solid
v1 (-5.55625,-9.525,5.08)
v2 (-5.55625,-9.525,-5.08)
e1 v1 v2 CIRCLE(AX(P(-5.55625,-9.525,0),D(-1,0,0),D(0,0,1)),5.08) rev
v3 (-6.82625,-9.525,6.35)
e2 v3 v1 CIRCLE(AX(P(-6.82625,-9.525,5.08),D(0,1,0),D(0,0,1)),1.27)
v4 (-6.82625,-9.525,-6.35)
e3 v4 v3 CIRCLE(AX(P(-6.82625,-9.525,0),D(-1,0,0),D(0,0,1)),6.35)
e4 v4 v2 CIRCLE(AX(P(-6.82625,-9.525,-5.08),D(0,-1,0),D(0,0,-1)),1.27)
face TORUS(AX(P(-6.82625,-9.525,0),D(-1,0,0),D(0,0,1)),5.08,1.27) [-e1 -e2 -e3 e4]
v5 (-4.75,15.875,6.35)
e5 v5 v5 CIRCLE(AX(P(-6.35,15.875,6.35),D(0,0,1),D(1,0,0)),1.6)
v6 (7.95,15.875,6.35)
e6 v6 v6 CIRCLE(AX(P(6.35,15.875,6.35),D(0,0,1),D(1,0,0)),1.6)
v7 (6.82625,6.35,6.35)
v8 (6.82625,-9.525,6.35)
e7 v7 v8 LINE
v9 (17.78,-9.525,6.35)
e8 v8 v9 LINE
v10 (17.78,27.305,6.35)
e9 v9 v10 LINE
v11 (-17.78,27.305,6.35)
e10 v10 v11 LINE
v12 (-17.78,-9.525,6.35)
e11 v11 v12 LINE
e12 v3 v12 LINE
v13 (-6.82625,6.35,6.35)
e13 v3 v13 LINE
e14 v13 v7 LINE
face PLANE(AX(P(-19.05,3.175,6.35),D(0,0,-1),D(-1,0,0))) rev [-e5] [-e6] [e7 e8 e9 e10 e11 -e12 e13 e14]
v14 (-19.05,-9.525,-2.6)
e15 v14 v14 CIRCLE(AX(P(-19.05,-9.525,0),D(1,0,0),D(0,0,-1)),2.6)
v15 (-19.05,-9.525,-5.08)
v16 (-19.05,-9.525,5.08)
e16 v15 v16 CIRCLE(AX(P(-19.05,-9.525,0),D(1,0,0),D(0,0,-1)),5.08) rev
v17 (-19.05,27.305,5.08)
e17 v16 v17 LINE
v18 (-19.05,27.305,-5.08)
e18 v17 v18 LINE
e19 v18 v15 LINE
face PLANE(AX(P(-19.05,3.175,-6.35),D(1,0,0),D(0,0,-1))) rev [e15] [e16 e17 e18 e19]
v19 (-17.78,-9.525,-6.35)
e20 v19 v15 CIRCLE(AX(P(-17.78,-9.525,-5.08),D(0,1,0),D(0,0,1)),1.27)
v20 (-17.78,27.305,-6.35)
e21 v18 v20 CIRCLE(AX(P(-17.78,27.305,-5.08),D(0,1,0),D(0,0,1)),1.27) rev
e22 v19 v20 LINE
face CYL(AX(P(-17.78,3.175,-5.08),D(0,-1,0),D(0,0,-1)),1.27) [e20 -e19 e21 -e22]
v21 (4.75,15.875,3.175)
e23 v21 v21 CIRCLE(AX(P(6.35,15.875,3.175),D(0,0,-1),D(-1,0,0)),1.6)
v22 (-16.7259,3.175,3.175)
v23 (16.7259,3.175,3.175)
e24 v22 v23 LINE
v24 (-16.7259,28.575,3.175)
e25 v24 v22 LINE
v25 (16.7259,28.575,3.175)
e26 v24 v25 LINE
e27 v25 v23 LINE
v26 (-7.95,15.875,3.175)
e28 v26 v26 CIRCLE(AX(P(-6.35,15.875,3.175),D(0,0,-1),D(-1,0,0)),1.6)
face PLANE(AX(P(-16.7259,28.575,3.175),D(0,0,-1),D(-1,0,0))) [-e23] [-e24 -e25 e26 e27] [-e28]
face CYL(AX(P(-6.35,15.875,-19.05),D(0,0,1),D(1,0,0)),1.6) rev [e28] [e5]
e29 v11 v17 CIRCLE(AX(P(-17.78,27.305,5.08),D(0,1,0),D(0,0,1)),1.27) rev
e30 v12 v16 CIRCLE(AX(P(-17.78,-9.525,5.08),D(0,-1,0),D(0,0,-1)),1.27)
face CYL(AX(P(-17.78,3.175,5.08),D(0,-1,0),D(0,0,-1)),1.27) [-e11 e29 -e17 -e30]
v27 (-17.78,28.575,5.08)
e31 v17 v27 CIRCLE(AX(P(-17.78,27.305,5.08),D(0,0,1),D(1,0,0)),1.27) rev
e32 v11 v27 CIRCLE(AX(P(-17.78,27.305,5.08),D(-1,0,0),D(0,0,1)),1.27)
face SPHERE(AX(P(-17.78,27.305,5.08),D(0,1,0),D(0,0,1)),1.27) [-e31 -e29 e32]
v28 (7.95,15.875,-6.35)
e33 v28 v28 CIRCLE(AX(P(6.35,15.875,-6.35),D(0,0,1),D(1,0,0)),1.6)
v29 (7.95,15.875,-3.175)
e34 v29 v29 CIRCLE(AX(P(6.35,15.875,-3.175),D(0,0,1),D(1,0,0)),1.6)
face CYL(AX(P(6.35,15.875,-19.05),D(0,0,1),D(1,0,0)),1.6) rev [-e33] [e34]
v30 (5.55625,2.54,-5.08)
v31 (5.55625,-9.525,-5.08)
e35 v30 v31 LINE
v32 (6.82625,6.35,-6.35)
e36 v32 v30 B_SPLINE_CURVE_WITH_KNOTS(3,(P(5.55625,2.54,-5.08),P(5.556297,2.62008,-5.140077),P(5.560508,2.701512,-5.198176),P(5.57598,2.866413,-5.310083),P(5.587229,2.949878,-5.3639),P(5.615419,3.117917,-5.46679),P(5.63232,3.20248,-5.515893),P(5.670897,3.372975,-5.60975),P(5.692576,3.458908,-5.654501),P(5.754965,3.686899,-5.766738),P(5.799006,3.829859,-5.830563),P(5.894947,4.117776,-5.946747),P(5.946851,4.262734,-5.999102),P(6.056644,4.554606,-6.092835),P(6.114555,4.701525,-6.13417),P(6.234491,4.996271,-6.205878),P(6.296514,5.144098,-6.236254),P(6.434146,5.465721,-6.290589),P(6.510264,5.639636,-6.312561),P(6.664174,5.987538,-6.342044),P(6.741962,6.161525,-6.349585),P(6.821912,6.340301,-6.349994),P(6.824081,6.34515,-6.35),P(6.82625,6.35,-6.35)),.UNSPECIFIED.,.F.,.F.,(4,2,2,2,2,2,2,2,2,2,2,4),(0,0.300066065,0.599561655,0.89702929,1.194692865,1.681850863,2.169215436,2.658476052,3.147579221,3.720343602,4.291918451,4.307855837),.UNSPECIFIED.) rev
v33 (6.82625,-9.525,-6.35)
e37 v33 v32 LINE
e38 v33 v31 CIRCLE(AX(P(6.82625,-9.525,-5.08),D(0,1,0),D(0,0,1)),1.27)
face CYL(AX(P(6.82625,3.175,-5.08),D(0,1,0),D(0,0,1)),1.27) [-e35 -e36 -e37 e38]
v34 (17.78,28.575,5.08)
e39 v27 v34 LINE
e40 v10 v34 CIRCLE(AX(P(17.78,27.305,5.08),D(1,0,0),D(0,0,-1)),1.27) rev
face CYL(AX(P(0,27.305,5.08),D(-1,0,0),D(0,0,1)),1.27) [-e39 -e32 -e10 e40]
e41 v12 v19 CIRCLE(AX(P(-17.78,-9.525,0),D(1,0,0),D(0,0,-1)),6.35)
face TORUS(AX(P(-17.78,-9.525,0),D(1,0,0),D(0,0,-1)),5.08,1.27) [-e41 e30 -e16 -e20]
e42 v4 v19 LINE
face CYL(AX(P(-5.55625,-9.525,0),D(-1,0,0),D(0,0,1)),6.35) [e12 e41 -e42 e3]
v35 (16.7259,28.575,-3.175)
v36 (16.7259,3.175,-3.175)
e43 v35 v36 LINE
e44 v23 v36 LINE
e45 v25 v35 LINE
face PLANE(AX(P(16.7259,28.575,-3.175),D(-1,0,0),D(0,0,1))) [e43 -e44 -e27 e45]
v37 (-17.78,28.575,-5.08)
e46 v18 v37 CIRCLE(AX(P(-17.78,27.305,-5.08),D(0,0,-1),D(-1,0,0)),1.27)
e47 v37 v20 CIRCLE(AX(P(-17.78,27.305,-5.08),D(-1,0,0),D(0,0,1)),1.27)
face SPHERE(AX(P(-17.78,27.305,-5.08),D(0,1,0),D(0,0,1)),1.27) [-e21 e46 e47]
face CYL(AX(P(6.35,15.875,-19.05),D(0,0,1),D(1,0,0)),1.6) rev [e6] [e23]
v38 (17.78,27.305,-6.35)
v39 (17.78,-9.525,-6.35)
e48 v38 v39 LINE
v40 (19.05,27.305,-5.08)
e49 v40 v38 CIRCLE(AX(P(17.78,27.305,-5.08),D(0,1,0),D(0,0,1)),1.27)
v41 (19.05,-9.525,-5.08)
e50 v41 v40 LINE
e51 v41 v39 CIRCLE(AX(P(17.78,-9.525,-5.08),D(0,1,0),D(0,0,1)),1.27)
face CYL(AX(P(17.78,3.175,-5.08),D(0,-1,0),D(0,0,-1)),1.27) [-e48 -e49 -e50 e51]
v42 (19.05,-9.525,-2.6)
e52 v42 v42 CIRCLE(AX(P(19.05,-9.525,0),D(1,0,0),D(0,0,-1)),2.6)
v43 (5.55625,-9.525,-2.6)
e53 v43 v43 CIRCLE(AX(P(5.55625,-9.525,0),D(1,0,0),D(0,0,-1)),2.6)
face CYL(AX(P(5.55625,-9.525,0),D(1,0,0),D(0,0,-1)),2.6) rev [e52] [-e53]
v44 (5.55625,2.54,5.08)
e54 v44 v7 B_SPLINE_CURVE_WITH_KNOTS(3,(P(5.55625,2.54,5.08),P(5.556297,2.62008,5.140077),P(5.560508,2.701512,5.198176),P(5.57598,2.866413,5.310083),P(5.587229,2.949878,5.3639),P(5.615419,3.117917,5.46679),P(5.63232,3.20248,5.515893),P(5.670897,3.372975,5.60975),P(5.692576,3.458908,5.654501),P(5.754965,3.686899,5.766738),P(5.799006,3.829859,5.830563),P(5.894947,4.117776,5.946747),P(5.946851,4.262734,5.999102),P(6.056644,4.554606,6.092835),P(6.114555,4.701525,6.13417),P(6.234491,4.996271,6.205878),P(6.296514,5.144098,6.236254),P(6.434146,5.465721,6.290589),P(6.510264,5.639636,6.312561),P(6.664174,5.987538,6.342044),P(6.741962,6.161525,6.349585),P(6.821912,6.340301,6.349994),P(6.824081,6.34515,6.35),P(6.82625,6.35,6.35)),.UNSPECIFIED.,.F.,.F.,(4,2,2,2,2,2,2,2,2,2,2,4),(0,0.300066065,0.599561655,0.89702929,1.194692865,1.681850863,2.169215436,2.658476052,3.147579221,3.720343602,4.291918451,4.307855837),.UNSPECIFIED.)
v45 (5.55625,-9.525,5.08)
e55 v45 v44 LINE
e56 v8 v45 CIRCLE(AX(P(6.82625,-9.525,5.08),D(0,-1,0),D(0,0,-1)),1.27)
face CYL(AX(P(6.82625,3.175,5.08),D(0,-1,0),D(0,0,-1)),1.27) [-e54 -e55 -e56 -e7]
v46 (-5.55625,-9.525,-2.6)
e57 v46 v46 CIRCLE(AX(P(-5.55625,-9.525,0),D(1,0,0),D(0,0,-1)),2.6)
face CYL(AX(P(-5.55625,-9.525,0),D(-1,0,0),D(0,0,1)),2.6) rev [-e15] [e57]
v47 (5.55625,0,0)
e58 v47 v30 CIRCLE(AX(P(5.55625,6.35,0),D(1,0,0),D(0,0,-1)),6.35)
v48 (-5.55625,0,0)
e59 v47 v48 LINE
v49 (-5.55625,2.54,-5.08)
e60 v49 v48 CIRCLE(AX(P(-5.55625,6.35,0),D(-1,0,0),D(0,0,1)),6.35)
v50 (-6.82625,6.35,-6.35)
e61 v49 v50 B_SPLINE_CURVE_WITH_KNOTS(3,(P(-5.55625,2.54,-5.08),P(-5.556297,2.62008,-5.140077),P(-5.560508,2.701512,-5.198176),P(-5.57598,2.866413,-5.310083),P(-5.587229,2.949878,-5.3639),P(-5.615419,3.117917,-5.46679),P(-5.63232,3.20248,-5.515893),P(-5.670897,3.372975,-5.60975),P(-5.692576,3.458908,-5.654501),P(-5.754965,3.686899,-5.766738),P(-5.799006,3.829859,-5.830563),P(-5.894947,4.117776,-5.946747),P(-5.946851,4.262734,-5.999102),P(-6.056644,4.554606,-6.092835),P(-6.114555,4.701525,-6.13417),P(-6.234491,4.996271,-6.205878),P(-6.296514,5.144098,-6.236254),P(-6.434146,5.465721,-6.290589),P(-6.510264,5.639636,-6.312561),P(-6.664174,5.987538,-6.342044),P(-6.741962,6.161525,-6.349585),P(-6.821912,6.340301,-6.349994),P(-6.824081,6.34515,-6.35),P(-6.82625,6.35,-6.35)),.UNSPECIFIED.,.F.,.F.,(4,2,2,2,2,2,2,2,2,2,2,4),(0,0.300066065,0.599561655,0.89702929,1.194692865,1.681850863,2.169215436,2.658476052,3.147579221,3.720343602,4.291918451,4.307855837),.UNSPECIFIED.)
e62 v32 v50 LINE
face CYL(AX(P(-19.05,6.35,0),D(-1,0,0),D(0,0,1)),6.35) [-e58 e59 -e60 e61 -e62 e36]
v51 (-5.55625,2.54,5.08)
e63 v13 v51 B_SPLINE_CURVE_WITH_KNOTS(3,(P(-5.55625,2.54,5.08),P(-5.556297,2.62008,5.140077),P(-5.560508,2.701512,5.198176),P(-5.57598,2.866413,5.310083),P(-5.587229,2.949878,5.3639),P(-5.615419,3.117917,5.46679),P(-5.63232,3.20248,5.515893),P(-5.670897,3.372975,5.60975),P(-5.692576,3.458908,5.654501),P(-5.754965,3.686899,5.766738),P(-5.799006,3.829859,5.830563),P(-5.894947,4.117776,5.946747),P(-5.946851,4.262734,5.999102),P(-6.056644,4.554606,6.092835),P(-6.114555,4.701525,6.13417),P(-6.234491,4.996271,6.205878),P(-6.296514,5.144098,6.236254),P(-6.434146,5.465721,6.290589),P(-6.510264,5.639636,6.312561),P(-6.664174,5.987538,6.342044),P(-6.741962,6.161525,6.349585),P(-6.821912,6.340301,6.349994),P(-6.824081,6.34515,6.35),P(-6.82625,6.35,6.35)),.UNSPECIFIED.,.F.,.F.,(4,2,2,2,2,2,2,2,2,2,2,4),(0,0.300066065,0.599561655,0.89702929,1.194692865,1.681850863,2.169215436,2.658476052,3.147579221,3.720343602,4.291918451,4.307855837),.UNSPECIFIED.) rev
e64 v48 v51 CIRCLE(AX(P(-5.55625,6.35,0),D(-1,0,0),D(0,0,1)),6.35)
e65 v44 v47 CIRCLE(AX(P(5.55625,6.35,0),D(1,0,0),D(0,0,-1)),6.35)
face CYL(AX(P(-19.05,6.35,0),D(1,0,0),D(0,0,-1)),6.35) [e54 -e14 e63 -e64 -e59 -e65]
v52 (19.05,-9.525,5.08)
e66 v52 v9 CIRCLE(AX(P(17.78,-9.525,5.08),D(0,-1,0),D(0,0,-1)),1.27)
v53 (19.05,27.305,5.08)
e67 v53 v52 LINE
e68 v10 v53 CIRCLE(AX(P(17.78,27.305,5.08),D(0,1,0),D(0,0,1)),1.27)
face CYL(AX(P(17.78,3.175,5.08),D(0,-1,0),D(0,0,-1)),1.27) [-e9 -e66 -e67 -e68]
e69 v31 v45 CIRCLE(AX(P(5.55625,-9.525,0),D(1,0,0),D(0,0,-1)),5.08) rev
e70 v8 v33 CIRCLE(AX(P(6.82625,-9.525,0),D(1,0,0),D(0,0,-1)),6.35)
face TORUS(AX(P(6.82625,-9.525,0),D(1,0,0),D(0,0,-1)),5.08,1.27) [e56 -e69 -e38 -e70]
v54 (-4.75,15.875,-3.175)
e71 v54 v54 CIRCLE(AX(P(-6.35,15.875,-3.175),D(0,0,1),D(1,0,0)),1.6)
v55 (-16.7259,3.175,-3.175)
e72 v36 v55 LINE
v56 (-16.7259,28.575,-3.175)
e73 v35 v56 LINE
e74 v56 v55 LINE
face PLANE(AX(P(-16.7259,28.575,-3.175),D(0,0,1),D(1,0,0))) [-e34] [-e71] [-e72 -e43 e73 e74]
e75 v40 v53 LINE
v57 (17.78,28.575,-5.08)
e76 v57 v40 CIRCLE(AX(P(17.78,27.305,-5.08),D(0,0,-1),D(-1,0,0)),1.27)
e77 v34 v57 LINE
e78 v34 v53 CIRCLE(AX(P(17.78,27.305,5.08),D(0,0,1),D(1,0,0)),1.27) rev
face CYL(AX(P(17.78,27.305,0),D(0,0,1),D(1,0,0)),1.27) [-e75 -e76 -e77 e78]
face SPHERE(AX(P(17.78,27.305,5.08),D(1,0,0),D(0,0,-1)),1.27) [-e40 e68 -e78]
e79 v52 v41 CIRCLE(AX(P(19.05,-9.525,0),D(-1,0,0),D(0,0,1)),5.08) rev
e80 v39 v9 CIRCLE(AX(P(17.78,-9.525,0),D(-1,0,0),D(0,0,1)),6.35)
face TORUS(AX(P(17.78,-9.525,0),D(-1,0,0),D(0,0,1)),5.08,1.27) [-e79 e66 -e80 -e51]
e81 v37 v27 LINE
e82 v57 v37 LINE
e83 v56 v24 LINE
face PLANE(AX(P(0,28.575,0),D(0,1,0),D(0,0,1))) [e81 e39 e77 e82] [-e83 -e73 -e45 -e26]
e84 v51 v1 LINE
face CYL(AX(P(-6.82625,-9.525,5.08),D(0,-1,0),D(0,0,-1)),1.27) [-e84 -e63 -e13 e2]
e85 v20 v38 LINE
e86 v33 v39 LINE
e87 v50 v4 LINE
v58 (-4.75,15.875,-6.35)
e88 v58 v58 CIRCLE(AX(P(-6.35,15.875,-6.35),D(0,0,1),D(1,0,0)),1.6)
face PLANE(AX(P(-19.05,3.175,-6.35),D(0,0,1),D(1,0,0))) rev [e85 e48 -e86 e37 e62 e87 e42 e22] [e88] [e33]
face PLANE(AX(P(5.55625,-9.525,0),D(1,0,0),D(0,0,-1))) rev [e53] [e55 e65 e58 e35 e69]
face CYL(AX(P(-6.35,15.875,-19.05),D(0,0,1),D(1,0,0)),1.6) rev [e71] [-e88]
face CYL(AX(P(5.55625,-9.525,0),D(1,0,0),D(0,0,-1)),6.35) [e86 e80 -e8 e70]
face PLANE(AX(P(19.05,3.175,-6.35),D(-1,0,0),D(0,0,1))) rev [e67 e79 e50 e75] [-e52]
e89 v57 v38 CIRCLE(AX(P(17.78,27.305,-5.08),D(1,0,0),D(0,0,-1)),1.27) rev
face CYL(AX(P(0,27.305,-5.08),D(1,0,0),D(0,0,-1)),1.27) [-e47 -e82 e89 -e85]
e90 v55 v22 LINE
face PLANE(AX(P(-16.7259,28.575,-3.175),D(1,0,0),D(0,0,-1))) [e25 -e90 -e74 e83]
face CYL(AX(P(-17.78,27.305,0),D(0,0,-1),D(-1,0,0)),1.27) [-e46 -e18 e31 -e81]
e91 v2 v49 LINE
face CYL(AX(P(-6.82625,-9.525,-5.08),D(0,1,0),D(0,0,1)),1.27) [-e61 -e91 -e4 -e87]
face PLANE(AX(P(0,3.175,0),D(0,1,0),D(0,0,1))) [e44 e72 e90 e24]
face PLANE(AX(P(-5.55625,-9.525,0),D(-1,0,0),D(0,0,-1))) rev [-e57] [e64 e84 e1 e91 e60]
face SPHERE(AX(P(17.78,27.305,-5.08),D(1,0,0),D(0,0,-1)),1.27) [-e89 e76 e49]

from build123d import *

# Parameters (mm, degrees)
ESQUISSE1_W             = 38.1
ESQUISSE1_H             = 12.7
BOSS_EXTRU_1_DEPTH      = 3.175
ESQUISSE2_W             = 38.1
ESQUISSE2_H             = 12.7
ESQUISSE2_W_2           = 33.4518
ESQUISSE2_H_2           = 6.35
BOSS_EXTRU_2_DEPTH      = 25.4
ESQUISSE3_R             = 1.6
ENL_V_MAT_EXTRU_1_DEPTH = 25.4
ESQUISSE4_R             = 2.6
BOSS_EXTRU_3_DEPTH      = 13.49375
CONG_1_R                = 6.35
CONG_2_R                = 1.27


with BuildPart() as part:
    # Esquisse1 → Boss.-Extru.1 (new body)
    with BuildSketch(Plane(origin=(0, 0, 0), x_dir=(1, 0, 0), z_dir=(0, 1, 0))):
        Rectangle(ESQUISSE1_W, ESQUISSE1_H)
    extrude(amount=BOSS_EXTRU_1_DEPTH)

    # Esquisse2 → Boss.-Extru.2 (add)
    with BuildSketch(Plane(origin=(0, 3.175, 0), x_dir=(1, 0, 0), z_dir=(0, 1, 0))):
        Rectangle(ESQUISSE2_W, ESQUISSE2_H)
        Rectangle(ESQUISSE2_W_2, ESQUISSE2_H_2, mode=Mode.SUBTRACT)
    extrude(amount=BOSS_EXTRU_2_DEPTH)

    # Esquisse3 → Enlèv. mat.-Extru.1 (cut)
    with BuildSketch(Plane.XY.offset(6.35)):
        with Locations((-6.35, 15.875)):
            Circle(ESQUISSE3_R)
        with Locations((6.35, 15.875)):
            Circle(ESQUISSE3_R)
    extrude(amount=-ENL_V_MAT_EXTRU_1_DEPTH, mode=Mode.SUBTRACT)

    # Esquisse4 → Boss.-Extru.3 (add)
    with BuildSketch(Plane(origin=(19.05, 0, 0), x_dir=(0, 0, -1), z_dir=(1, 0, 0))):
        with BuildLine():
            Line((-6.35, 0), (-6.35, -9.525))
            ThreePointArc((-6.35, -9.525), (0, -15.875), (6.35, -9.525))
            Line((6.35, -9.525), (6.35, 0))
            Line((6.35, 0), (-6.35, 0))
        make_face()
        with Locations((0, -9.525)):
            Circle(ESQUISSE4_R, mode=Mode.SUBTRACT)
    boss_extru_3 = extrude(amount=-BOSS_EXTRU_3_DEPTH)

    # Symétrie1: Boss.-Extru.3 across plane
    add(boss_extru_3.mirror(Plane(origin=(0, 0, 0), x_dir=(0, 0, 1), z_dir=(1, 0, 0))))

    # Congé1
    cong_1_edges = [part.edges().sort_by_distance(p)[0] for p in [
        (0, 0, -6.35),
        (0, 0, 6.35),
    ]]
    fillet(cong_1_edges, radius=CONG_1_R - 0.0001)  # a hair under: the kernel refuses the full size

    # Congé2
    cong_2_edges = [part.edges().sort_by_distance(p)[0] for p in [
        (-19.05, 28.575, 0),
        (0, 28.575, 6.35),
        (19.05, 28.575, 0),
        (0, 28.575, -6.35),
        (5.55625, -1.58755, -6.35),
        (5.55625, -15.875, 0),
        (5.55625, -1.58755, 6.35),
        (19.05, -15.875, 0),
        (-5.55625, -1.58755, 6.35),
        (-5.55625, -15.875, 0),
        (-5.55625, -1.58755, -6.35),
        (-19.05, -15.875, 0),
        (19.05, 9.525, 6.35),
        (-19.05, 9.525, 6.35),
        (-19.05, 9.525, -6.35),
        (19.05, 9.525, -6.35),
    ]]
    fillet(cong_2_edges, radius=CONG_2_R)


solid = part.part
